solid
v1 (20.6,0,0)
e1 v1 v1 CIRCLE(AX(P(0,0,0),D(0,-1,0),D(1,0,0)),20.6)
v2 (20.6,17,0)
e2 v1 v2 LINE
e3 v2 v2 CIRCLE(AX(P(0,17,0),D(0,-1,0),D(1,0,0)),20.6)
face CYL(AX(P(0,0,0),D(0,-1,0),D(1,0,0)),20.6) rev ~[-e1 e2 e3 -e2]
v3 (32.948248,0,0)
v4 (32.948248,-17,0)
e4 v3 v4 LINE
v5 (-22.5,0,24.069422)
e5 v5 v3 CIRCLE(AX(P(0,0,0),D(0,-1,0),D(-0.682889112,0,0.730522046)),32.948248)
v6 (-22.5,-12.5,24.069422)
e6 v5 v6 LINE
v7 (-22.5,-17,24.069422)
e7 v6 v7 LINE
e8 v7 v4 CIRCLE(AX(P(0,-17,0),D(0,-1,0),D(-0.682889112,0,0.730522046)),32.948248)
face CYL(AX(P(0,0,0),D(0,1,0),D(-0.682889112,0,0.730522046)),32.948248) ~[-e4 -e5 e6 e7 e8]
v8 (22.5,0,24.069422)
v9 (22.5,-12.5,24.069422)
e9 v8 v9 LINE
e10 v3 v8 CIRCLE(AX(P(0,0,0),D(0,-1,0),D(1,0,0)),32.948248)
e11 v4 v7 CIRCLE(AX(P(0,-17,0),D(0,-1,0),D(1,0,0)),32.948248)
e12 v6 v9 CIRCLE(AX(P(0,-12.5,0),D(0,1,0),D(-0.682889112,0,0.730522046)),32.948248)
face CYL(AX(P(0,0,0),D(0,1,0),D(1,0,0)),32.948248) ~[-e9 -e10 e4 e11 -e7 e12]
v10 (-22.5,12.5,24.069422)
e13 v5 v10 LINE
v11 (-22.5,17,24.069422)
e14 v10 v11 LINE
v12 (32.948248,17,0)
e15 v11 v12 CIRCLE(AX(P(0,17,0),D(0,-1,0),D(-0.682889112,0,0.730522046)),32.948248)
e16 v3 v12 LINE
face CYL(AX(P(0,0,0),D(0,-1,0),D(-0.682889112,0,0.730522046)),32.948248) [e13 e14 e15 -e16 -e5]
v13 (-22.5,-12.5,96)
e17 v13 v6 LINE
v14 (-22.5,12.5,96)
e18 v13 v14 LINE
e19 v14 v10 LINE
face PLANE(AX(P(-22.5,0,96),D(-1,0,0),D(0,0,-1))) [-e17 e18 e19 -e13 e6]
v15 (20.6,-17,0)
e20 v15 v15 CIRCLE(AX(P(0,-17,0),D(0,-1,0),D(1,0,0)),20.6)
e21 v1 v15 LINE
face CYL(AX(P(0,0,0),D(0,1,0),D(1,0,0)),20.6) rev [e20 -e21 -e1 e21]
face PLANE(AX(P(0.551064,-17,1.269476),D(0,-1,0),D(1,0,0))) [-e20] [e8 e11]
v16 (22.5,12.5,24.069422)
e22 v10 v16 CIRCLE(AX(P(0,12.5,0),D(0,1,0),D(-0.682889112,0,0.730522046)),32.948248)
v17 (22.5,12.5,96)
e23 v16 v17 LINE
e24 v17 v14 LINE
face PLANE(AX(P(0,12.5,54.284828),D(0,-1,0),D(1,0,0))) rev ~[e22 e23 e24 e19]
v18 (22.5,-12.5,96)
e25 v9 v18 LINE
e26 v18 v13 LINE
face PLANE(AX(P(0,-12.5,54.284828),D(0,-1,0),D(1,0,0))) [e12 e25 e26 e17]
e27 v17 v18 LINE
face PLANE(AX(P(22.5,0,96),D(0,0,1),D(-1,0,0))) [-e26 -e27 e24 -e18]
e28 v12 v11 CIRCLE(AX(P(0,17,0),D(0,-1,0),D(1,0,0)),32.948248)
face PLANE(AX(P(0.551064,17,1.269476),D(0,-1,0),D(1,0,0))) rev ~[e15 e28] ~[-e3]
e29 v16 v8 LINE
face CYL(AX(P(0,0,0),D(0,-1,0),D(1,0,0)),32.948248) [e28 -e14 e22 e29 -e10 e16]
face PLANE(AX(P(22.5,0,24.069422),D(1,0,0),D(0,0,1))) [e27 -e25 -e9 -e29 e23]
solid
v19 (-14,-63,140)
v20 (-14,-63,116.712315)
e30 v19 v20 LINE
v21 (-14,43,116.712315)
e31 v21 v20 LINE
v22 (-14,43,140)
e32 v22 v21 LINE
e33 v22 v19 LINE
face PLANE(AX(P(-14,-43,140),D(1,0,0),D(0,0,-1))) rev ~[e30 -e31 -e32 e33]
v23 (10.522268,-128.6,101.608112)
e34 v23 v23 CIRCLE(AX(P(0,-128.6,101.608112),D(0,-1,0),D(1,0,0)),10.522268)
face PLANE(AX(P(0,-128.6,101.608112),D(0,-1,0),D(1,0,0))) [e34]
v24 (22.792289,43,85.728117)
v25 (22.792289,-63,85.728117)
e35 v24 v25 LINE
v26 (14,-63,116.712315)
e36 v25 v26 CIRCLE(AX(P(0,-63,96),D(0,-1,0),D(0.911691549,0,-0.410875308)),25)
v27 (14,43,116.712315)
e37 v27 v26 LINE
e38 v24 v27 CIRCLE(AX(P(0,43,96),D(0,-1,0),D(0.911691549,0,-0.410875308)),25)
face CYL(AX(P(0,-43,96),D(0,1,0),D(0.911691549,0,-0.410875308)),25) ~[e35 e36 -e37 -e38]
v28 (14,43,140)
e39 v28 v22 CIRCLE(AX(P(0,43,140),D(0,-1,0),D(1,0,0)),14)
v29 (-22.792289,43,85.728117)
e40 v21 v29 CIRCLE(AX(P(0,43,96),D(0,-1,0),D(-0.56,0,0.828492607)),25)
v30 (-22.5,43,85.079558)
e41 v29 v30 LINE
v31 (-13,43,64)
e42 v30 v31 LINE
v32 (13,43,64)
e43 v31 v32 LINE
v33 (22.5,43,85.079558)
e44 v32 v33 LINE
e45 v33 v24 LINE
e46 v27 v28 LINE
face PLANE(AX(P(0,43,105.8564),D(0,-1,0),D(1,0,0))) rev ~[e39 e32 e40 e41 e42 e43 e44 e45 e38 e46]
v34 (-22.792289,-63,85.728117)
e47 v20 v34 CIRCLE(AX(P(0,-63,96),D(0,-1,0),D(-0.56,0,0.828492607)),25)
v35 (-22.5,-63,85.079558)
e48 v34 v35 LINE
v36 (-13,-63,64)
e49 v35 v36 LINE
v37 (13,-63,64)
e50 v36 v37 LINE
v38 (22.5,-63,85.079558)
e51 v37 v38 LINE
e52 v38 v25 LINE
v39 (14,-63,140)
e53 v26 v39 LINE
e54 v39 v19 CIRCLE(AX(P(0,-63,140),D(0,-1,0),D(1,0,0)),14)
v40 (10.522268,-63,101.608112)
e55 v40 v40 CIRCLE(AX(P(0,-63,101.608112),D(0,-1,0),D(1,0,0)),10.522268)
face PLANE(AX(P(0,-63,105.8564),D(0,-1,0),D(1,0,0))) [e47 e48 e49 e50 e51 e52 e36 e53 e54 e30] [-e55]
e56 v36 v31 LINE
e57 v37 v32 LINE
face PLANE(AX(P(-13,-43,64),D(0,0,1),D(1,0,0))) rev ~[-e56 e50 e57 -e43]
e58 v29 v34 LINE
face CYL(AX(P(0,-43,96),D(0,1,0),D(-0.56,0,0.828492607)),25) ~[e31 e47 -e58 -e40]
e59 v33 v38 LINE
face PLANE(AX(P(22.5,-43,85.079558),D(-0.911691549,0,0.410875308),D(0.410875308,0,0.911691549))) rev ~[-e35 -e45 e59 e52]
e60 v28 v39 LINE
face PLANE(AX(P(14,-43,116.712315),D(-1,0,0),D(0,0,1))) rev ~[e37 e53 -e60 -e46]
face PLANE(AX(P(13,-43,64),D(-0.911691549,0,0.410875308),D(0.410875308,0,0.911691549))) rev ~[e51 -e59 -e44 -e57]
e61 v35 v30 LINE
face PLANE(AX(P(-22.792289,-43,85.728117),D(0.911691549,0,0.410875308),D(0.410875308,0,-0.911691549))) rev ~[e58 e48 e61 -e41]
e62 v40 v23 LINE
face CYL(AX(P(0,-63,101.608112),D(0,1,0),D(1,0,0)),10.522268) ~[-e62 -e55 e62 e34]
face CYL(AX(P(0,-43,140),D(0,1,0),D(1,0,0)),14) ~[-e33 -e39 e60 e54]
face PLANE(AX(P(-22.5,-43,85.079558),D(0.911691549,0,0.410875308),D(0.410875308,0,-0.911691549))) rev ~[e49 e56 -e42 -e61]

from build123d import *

# Parameters (mm, degrees)
F0_R     = 20.6
F1_DEPTH = 17
F2_DEPTH = 12.5
F4_DEPTH = 43
F5_DEPTH = 20
F6_R     = 10.5222684304
F7_DEPTH = 65.6


# Not quite as in the source:
# - a feature names something its author has since deleted; it is built from what else it names


with BuildPart() as f1:
    # F0 (on Front) → F1 (new body, symmetric)
    with BuildSketch(Plane.XZ):
        with BuildLine():
            ThreePointArc((-22.5, 24.0694217363), (-13.1196699102, -30.2235226962), (32.9482482496, 0))
            ThreePointArc((32.9482482496, 0), (30.2235226962, 13.1196699102), (22.5, 24.0694217363))
            ThreePointArc((22.5, 24.0694217363), (0, 32.9482482496), (-22.5, 24.0694217363))
        make_face()
        Circle(F0_R, mode=Mode.SUBTRACT)
    extrude(amount=F1_DEPTH, both=True)

    # F0 (on Front) → F2 (join, symmetric)
    with BuildSketch(Plane.XZ):
        with BuildLine():
            ThreePointArc((-22.5, 24.0694217363), (0, 32.9482482496), (22.5, 24.0694217363))
            Line((22.5, 24.0694217363), (22.5, 85.0795575915))
            Line((22.5, 85.0795575915), (13, 64))
            Line((13, 64), (-13, 64))
            Line((-13, 64), (-22.5, 85.0795575915))
            Line((-22.5, 85.0795575915), (-22.5, 24.0694217363))
        make_face()
        Polygon((13, 64), (22.5, 85.0795575915), (22.5, 96), (-22.5, 96), (-22.5, 85.0795575915), (-13, 64), align=None)
    extrude(amount=F2_DEPTH, both=True)


with BuildPart() as f4:
    # F3 (on Front) → F4 (new body, symmetric)
    with BuildSketch(Plane.XZ):
        with BuildLine():
            Line((13, 64), (22.5, 85.0795575915))
            Line((22.5, 85.0795575915), (22.7922887347, 85.7281172985))
            ThreePointArc((22.7922887347, 85.7281172985), (24.0504315373, 102.8247155888), (14, 116.7123151772))
            Line((14, 116.7123151772), (14, 140))
            ThreePointArc((14, 140), (0, 154), (-14, 140))
            Line((-14, 140), (-14, 116.7123151772))
            ThreePointArc((-14, 116.7123151772), (-24.0504315373, 102.8247155888), (-22.7922887347, 85.7281172985))
            Line((-22.7922887347, 85.7281172985), (-22.5, 85.0795575915))
            Line((-22.5, 85.0795575915), (-13, 64))
            Line((-13, 64), (13, 64))
        make_face()
    extrude(amount=F4_DEPTH, both=True)

    # F5 (add): a face of the model
    f5_faces = [f4.faces().sort_by_distance(p)[0] for p in [
        (0, -43, 104.5669509918),
    ]]
    extrude(f5_faces, amount=F5_DEPTH)

    # F6 (on face) → F7 (join)
    with BuildSketch(Plane.XZ.offset(63)):
        with Locations((0, 101.6081124544)):
            Circle(F6_R)
    extrude(amount=F7_DEPTH)


solid = Compound([f1.part, f4.part])
